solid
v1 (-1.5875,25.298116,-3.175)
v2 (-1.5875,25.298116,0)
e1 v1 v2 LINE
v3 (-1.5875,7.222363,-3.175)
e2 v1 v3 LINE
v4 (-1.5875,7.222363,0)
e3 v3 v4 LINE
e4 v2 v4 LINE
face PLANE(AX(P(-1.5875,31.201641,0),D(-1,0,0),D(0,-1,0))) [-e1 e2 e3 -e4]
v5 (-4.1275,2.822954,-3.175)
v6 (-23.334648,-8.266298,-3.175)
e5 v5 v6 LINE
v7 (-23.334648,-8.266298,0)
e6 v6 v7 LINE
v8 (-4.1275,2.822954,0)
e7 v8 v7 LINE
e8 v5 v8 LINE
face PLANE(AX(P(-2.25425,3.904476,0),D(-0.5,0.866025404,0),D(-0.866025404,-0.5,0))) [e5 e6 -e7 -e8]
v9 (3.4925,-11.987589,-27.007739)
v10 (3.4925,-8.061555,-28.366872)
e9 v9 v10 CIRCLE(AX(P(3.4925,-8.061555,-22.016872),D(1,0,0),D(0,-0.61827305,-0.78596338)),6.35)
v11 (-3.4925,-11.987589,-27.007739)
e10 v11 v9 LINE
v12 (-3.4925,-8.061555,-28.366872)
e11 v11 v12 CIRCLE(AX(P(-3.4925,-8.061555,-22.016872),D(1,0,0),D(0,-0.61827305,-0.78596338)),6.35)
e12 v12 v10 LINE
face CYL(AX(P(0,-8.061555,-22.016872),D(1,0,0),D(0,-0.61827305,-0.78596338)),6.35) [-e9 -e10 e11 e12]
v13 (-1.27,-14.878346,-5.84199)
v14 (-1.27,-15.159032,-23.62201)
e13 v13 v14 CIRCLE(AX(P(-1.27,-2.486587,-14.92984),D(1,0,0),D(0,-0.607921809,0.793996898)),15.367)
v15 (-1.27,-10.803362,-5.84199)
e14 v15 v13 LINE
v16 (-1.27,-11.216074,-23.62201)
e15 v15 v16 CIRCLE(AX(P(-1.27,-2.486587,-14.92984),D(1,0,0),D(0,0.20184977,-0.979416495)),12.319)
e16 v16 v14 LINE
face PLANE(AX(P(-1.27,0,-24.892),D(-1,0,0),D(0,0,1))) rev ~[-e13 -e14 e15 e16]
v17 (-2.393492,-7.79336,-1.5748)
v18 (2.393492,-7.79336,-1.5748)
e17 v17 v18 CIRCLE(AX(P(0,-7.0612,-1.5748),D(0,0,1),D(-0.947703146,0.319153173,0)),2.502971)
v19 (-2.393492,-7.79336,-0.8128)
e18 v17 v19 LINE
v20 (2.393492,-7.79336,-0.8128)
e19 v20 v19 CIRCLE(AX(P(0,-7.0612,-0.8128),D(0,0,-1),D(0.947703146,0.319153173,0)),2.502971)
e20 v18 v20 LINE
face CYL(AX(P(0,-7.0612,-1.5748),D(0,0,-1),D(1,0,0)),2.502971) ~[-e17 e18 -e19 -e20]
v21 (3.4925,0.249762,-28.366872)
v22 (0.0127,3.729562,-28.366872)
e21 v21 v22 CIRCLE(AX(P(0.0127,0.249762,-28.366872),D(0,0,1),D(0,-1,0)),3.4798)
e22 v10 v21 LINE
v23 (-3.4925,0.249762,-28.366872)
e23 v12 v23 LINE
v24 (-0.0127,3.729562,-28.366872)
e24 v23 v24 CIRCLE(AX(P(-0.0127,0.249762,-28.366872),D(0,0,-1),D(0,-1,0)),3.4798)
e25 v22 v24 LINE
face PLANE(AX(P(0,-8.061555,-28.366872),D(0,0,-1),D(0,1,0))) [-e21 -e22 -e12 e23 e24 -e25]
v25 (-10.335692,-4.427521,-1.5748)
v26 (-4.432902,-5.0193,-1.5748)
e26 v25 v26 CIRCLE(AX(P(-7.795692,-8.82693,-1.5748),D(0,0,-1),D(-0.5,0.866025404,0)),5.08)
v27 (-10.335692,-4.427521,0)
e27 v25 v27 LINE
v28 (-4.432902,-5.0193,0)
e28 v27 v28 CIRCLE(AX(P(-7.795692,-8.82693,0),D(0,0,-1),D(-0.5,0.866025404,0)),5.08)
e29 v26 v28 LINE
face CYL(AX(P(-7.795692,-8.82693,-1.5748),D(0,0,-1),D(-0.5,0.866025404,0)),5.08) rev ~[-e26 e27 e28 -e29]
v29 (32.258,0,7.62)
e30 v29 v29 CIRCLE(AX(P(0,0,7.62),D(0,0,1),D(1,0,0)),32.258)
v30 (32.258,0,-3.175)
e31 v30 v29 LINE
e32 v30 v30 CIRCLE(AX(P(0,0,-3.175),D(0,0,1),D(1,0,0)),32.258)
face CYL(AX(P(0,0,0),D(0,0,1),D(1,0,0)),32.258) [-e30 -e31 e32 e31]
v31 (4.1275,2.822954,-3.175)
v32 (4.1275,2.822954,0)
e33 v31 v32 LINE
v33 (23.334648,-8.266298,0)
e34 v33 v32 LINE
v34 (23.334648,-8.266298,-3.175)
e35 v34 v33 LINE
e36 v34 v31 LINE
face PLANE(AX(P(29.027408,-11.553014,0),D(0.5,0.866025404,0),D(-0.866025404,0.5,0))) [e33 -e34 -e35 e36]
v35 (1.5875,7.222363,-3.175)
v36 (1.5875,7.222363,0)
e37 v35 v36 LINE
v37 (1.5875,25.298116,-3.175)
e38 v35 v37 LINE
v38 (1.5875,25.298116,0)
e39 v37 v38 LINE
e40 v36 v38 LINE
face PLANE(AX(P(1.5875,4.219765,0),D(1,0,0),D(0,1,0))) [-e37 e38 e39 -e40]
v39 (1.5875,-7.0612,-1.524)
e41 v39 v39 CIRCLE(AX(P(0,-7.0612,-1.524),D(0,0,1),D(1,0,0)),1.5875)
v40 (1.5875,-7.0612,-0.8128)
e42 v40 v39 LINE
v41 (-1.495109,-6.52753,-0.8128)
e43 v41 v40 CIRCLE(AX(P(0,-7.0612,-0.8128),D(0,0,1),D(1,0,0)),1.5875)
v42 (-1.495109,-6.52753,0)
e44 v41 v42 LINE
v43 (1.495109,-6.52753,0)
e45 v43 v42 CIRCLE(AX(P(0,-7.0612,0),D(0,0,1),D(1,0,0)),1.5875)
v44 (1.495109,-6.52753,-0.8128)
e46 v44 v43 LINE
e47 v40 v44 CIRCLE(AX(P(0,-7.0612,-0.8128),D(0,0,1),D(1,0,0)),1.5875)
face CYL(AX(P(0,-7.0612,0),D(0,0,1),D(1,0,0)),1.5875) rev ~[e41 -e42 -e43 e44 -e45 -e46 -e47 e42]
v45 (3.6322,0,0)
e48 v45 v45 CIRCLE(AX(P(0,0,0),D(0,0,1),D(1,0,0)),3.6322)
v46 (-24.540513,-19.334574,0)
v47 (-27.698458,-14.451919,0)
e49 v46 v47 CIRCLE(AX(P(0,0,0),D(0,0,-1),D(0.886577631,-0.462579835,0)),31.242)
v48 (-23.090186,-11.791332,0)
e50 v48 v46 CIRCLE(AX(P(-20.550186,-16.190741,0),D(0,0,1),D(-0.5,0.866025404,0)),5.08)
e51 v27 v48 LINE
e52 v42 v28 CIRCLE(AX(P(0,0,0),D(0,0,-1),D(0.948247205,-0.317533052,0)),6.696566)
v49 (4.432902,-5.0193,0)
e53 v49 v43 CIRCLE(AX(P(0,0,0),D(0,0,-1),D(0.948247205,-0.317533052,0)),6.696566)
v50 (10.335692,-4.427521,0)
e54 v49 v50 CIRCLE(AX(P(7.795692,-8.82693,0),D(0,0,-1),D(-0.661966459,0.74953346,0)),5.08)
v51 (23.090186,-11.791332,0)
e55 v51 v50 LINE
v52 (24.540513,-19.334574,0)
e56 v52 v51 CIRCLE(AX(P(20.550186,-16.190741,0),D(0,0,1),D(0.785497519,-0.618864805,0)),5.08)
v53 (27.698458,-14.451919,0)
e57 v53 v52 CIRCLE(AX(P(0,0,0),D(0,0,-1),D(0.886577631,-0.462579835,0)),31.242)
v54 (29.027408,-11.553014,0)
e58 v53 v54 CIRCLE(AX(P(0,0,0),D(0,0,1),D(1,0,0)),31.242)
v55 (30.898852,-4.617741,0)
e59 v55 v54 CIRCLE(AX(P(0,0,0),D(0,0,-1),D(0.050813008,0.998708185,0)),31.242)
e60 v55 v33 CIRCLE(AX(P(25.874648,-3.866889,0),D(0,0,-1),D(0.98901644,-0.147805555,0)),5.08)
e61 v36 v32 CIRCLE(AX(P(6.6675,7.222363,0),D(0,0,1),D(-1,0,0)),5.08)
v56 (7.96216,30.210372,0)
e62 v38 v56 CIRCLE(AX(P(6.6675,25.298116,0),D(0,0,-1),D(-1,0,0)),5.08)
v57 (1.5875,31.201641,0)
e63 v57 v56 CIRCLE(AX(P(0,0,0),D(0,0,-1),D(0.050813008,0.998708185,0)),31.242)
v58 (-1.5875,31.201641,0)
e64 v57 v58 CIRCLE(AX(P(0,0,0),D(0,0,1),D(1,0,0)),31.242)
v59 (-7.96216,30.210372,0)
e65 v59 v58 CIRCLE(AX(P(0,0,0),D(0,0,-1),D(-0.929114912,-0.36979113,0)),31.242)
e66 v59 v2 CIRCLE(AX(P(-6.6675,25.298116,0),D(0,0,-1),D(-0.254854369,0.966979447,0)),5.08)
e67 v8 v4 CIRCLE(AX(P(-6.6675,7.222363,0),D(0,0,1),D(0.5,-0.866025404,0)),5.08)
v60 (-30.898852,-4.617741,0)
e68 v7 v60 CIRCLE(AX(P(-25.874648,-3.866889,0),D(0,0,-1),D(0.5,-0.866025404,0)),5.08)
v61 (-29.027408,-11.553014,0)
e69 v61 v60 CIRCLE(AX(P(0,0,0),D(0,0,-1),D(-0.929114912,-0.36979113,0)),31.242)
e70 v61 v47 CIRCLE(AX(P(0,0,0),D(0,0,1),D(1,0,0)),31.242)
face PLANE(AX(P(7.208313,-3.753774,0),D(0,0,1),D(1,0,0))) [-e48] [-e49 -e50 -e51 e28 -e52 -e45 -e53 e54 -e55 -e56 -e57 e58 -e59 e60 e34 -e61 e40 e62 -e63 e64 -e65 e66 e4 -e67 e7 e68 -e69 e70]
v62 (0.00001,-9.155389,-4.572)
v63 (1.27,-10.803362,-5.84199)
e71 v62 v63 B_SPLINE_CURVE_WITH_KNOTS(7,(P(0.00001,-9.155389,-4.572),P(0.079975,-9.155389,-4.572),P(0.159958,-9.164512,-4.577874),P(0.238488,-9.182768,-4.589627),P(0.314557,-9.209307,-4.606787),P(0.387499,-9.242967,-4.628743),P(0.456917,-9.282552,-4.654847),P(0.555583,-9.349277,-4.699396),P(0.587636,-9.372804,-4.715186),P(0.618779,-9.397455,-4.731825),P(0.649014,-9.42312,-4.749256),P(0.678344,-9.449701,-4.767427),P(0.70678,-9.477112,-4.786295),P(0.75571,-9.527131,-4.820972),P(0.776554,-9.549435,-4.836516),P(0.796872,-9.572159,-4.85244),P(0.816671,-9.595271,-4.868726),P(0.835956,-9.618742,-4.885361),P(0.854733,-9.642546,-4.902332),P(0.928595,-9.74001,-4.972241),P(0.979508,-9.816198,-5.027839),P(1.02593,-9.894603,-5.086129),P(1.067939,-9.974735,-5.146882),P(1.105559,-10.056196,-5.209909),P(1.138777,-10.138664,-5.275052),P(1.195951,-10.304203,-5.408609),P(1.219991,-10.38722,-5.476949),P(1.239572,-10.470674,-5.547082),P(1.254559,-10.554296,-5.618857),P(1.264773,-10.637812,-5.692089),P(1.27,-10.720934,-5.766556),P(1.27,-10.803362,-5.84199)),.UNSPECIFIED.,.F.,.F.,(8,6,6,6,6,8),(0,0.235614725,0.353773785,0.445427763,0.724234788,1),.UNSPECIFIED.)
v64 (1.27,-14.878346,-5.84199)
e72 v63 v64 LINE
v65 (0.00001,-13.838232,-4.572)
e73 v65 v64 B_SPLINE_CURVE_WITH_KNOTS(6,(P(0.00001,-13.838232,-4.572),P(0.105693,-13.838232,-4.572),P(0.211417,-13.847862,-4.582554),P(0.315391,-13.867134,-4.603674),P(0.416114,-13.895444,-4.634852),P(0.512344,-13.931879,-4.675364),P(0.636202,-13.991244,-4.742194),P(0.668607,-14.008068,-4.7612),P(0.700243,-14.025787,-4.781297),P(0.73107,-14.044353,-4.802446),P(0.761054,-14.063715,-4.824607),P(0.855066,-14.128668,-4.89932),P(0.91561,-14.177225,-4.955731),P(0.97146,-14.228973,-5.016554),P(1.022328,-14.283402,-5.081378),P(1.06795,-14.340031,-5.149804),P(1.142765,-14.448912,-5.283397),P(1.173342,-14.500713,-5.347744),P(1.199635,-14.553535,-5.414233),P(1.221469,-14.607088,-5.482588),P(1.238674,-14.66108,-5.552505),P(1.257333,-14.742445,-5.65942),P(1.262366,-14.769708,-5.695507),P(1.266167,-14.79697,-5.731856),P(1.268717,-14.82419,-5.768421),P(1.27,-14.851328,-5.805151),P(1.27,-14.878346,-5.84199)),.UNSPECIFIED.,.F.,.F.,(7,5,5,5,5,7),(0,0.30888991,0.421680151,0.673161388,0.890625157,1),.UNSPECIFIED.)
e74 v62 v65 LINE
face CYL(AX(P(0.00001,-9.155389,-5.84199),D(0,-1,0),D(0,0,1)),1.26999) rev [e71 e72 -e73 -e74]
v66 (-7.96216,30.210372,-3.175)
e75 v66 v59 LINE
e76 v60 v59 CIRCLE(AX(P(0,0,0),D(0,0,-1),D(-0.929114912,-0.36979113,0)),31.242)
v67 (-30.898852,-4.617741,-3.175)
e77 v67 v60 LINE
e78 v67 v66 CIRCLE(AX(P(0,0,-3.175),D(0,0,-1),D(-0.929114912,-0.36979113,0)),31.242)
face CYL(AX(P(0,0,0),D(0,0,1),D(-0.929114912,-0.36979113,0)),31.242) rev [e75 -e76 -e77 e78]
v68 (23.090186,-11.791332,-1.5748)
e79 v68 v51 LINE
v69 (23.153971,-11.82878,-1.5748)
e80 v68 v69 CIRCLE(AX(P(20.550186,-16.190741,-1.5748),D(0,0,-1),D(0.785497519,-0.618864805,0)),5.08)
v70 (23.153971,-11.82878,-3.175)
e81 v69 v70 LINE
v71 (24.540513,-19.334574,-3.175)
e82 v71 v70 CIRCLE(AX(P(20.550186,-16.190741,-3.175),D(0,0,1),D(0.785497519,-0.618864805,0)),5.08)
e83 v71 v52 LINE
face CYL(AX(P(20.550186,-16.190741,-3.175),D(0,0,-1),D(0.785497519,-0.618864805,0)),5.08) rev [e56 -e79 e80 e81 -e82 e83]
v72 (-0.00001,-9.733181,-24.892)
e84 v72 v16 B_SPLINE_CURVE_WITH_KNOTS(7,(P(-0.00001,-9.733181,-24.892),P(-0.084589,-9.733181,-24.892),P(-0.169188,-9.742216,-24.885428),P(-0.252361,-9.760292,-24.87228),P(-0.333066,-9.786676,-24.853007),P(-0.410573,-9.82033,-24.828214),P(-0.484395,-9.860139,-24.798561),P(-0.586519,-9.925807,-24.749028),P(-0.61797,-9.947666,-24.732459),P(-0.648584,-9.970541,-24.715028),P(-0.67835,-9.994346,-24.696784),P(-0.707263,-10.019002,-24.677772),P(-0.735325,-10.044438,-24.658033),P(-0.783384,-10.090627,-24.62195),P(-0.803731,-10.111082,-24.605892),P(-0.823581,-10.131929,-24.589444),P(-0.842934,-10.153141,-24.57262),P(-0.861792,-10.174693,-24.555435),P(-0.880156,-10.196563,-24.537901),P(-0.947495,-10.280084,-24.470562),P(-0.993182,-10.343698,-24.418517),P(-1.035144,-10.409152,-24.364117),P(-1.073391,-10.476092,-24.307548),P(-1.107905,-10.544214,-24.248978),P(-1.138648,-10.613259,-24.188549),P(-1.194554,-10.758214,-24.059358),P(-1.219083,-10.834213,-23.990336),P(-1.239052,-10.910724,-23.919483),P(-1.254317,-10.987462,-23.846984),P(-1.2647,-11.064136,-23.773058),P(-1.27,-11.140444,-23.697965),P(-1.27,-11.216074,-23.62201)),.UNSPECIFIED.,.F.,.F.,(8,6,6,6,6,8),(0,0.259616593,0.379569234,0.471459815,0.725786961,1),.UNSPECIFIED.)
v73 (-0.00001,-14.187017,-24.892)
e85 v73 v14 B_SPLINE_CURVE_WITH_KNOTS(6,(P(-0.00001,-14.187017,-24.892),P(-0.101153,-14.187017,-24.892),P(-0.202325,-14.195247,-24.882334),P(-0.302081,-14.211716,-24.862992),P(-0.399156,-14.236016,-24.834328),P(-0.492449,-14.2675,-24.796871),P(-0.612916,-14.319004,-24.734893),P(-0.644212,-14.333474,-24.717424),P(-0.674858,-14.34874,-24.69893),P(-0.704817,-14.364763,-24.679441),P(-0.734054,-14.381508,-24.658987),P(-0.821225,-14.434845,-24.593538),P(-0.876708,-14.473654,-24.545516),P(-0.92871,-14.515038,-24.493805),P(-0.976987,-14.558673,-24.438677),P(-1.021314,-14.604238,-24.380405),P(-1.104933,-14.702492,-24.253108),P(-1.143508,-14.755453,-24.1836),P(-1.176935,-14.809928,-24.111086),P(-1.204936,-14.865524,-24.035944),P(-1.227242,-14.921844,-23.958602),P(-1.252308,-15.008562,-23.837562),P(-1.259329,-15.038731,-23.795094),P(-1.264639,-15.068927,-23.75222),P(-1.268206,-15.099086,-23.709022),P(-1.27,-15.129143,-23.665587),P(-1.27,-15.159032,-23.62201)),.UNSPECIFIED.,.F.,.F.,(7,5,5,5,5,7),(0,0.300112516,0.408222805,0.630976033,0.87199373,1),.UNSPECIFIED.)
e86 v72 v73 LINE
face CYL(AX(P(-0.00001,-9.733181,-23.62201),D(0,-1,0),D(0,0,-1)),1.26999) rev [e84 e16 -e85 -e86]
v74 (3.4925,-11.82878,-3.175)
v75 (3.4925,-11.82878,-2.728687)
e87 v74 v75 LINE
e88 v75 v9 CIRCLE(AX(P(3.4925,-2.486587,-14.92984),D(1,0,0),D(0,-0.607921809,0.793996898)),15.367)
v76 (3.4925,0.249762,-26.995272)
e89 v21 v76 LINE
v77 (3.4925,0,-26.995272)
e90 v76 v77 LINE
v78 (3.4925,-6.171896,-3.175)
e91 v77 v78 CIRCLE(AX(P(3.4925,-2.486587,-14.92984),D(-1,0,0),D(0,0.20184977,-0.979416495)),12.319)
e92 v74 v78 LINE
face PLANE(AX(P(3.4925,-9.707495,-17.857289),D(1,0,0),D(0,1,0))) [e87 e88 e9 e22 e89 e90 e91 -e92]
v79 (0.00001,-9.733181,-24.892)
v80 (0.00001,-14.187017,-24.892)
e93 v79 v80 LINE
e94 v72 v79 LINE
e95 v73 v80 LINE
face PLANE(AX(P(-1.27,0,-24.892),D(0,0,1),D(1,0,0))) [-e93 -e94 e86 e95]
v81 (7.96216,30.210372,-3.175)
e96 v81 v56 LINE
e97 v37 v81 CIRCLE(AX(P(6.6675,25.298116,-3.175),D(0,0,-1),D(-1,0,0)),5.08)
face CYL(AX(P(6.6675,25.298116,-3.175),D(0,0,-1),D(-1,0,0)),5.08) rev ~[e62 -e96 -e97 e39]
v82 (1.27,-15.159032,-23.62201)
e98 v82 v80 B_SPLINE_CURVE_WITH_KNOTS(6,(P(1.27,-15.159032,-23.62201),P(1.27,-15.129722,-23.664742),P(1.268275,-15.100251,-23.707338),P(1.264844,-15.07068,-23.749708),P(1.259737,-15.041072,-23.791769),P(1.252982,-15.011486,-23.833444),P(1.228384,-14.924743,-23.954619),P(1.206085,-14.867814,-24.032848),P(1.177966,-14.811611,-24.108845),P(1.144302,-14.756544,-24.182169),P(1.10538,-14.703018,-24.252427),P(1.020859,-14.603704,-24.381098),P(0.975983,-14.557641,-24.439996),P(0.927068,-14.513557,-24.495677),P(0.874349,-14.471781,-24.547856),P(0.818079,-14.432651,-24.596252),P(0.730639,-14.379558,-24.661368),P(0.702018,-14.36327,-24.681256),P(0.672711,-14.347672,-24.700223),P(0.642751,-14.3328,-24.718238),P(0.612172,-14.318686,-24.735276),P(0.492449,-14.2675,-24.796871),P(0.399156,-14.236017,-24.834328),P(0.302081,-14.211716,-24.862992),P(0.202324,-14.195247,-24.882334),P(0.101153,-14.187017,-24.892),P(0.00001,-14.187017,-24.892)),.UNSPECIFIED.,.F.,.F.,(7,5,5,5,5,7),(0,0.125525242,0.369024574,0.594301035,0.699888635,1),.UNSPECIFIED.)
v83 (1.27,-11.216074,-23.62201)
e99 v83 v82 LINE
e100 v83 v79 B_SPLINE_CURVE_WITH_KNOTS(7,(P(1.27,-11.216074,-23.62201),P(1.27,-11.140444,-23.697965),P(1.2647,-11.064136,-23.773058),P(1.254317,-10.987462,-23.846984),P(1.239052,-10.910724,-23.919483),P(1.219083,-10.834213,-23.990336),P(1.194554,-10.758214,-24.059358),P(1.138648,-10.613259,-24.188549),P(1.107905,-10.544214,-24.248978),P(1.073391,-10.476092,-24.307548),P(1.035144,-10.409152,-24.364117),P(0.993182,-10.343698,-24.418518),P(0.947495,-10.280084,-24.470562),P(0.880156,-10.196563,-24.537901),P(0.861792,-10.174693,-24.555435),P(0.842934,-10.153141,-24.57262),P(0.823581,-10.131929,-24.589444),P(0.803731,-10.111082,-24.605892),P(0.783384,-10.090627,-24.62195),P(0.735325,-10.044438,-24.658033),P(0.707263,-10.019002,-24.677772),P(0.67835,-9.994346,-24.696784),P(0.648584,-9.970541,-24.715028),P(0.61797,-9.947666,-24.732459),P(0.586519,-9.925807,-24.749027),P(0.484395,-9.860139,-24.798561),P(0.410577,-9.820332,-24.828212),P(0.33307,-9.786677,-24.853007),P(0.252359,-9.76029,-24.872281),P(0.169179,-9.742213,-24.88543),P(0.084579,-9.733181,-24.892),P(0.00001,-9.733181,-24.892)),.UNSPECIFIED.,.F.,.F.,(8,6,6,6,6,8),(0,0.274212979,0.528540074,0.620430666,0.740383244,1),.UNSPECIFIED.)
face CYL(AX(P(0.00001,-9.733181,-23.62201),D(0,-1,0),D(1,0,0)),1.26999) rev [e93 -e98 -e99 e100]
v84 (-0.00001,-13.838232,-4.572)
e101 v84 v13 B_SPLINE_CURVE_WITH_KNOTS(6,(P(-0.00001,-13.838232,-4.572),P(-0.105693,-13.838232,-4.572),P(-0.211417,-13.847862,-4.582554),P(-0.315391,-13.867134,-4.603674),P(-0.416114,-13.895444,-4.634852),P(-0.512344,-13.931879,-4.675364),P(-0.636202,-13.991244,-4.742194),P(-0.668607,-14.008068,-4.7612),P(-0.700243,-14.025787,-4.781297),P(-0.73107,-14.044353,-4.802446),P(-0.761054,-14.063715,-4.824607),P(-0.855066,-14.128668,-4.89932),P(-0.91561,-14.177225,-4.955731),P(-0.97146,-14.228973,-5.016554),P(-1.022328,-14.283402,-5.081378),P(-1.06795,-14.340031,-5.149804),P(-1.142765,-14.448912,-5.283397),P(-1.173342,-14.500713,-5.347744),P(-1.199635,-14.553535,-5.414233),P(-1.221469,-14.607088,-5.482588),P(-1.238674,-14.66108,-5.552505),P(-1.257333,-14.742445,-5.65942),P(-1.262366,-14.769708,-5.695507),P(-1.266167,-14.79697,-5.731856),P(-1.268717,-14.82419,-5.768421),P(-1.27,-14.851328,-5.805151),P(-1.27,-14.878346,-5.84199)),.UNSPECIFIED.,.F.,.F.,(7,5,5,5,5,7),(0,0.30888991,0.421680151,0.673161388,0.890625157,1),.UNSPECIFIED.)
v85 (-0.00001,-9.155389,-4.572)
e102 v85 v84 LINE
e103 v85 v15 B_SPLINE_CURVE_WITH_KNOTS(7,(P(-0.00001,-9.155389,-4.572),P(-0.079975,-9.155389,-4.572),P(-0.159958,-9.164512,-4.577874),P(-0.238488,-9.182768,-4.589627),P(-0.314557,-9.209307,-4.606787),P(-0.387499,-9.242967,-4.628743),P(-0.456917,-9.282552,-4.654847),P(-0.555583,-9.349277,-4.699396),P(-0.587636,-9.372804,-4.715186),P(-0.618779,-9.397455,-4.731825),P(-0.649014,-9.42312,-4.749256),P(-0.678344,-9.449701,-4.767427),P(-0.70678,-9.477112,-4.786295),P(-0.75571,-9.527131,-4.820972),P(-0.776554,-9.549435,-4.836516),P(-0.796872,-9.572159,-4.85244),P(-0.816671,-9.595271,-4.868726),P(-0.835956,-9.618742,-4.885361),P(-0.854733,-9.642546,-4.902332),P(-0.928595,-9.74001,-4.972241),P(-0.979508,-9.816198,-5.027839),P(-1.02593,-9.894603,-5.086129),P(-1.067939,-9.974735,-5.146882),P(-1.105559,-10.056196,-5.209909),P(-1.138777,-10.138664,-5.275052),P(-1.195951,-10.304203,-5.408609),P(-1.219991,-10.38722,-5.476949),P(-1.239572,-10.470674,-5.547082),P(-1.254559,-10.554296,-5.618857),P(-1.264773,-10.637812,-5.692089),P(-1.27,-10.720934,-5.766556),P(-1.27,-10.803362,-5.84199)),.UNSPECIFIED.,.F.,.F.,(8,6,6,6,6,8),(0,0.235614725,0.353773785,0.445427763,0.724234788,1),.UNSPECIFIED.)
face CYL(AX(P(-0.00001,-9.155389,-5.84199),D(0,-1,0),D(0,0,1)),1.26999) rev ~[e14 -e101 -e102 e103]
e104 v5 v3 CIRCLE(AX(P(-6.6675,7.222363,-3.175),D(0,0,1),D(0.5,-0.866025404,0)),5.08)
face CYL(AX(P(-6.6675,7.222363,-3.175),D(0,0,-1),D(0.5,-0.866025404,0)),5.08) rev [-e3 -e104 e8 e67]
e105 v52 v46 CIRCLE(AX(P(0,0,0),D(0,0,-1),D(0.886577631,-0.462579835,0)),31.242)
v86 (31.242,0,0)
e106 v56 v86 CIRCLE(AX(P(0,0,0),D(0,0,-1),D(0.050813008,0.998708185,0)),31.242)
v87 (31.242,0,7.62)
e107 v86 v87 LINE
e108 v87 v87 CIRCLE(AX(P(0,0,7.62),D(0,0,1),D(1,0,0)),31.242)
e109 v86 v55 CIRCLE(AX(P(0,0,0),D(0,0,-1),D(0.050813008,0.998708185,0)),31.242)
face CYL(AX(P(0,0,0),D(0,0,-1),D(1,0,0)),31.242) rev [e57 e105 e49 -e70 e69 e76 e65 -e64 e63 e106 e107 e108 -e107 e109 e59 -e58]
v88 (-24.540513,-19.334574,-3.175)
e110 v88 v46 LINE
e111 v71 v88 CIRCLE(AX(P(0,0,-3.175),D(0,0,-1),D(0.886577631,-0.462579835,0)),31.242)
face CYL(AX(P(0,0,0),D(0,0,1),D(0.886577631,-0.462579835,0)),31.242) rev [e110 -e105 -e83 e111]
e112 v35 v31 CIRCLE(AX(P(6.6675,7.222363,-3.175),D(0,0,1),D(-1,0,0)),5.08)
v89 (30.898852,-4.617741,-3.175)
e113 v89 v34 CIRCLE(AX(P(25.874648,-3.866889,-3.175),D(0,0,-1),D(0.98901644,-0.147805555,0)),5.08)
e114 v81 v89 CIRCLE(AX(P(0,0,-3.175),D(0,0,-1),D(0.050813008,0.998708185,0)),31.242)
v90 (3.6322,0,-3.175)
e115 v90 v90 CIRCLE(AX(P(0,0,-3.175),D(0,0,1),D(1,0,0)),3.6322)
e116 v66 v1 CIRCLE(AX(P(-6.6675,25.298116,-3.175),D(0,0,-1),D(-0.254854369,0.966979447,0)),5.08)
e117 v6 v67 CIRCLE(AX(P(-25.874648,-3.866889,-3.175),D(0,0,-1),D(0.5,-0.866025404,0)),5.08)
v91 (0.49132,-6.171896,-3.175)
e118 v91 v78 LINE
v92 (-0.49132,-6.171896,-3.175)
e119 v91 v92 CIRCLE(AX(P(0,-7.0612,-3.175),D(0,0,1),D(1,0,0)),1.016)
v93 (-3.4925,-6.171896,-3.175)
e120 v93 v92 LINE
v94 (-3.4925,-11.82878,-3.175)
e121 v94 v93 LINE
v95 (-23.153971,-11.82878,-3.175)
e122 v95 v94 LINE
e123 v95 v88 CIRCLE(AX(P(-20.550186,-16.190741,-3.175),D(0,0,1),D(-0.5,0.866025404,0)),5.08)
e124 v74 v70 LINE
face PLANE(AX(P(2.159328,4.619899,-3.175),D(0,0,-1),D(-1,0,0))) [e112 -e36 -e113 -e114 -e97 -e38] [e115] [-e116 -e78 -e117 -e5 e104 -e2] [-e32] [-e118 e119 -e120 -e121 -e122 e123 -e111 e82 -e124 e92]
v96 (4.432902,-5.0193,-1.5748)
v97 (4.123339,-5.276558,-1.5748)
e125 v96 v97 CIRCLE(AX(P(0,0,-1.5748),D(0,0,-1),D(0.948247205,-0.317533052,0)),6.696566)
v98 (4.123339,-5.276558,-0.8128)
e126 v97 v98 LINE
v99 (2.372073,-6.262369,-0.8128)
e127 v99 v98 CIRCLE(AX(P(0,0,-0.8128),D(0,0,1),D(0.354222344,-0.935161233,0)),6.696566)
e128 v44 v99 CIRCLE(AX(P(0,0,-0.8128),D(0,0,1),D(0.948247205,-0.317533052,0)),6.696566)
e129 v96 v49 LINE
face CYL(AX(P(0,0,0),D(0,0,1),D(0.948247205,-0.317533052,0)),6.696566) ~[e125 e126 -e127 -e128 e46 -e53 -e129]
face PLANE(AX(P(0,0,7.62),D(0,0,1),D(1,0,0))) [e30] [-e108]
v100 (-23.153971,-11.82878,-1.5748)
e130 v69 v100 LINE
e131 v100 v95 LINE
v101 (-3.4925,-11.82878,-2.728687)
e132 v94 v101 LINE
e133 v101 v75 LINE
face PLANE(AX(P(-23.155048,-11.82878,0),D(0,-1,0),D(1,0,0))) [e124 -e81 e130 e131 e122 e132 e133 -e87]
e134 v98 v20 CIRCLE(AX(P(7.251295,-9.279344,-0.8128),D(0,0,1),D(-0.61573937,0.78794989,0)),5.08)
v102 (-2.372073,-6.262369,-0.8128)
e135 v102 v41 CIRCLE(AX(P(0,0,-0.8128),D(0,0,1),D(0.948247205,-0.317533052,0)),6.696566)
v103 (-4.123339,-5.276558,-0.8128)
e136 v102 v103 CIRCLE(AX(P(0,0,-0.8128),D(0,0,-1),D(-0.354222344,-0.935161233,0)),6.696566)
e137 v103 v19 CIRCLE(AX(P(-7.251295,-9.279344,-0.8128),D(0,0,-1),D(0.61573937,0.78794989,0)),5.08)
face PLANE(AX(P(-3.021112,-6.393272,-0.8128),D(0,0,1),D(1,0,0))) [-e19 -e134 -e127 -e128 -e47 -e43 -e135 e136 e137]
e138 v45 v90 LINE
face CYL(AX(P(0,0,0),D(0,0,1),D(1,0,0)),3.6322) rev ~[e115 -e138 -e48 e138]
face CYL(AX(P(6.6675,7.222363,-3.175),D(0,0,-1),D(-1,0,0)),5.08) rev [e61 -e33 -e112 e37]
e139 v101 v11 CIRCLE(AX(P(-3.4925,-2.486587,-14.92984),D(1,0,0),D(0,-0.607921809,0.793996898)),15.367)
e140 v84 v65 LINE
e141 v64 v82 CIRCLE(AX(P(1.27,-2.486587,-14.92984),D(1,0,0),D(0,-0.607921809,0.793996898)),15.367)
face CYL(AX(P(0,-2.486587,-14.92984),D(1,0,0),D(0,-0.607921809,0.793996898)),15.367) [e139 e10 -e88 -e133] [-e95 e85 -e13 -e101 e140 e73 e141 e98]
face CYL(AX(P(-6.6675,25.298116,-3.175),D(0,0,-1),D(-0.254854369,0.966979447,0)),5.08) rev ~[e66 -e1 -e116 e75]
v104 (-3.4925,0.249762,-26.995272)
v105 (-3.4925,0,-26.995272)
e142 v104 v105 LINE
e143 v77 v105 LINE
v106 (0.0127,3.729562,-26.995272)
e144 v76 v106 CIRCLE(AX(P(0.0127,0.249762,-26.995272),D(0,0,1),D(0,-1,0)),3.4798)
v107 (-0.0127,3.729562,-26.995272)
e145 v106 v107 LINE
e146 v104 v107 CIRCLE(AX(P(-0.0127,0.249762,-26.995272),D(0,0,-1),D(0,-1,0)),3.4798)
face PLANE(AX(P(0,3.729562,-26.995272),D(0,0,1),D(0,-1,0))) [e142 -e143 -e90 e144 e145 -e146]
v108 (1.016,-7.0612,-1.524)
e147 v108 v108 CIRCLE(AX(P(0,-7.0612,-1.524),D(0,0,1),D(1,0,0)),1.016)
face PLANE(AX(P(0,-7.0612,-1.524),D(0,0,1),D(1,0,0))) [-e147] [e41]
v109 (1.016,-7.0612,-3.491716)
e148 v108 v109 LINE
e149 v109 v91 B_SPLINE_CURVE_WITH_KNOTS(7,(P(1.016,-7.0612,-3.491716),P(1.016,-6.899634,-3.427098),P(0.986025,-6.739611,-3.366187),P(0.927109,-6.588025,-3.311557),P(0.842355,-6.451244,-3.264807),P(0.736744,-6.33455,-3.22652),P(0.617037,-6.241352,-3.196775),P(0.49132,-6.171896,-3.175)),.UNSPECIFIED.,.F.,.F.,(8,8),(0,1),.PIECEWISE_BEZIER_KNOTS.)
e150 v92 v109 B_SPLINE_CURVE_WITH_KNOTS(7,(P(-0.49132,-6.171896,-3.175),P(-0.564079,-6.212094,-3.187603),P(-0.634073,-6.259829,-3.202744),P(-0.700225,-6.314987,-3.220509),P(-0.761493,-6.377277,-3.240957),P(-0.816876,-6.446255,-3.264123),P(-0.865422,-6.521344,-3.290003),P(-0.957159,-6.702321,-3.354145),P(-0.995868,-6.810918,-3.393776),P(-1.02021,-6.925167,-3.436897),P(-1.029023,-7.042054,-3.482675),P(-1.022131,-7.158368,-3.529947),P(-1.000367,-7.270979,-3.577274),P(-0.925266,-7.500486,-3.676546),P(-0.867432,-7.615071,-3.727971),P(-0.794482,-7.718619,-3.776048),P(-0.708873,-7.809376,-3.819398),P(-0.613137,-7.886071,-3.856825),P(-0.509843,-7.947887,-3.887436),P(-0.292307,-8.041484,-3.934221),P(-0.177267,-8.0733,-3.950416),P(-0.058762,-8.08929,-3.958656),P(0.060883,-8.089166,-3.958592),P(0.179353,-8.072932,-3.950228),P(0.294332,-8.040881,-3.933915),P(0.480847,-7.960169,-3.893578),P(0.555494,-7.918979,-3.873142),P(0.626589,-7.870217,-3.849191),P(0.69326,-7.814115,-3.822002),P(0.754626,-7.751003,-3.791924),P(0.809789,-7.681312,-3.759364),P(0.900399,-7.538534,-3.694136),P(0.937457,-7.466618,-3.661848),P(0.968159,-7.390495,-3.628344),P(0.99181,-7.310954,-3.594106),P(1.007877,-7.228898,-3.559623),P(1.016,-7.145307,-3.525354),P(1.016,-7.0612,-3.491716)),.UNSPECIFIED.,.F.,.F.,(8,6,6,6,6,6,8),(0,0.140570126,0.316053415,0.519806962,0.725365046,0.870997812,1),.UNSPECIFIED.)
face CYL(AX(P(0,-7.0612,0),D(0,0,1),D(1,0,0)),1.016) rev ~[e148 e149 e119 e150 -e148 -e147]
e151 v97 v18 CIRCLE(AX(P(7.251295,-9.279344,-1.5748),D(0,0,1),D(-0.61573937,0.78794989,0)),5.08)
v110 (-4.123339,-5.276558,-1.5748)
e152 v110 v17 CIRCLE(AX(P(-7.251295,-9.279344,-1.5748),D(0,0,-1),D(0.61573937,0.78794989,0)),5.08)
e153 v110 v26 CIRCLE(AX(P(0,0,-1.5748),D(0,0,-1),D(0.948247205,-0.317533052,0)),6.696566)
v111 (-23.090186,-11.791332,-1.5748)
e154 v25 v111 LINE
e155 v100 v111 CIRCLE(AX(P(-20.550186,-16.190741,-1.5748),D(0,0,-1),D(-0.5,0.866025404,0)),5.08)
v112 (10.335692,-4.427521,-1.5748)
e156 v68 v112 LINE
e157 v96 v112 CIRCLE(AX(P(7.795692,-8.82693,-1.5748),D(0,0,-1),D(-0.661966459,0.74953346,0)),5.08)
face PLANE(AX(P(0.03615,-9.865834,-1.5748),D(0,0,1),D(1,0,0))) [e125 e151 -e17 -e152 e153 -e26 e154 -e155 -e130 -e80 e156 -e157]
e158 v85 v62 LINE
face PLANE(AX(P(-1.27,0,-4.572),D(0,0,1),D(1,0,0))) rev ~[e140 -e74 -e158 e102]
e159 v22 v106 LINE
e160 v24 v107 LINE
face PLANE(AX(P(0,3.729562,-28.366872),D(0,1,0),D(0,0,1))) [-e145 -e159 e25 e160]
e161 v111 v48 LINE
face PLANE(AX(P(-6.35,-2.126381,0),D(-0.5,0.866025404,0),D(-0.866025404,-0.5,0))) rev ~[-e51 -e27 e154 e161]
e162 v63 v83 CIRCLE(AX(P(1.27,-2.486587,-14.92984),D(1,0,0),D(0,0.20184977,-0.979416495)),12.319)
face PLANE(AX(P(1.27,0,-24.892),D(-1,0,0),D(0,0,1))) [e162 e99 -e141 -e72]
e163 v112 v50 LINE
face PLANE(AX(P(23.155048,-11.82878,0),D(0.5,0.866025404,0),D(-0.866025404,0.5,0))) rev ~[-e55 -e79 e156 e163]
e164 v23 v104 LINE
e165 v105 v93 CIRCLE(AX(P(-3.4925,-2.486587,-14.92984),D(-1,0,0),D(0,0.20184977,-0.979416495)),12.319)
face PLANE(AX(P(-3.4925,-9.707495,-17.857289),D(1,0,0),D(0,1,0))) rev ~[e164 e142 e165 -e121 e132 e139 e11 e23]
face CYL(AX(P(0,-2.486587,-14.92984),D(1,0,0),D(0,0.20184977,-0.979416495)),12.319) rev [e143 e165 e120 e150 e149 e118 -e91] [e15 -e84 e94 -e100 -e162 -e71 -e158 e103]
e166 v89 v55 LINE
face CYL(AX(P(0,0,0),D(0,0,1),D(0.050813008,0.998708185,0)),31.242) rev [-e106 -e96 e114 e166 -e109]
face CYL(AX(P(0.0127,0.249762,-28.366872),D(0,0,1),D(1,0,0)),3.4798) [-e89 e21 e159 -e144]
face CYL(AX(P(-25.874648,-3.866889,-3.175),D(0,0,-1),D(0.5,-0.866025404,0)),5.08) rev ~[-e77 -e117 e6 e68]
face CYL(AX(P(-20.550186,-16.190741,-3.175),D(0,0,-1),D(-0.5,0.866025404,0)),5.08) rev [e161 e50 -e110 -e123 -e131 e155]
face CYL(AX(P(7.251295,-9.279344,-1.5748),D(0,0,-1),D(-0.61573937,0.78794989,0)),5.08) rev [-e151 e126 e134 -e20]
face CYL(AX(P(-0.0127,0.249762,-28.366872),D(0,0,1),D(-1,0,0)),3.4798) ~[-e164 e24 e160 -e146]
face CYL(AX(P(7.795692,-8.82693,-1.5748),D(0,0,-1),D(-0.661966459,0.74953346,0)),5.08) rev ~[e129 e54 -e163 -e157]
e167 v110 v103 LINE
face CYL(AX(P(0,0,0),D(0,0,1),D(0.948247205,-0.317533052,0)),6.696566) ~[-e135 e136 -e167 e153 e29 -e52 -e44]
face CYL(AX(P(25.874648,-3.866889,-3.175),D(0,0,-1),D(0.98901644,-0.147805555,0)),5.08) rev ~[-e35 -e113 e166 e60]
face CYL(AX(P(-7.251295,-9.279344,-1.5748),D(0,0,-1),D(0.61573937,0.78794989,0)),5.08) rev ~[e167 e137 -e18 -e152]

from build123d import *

# Parameters (mm, degrees)
F0_R         = 32.258
F0_R_2       = 3.6322
F1_DEPTH     = 3.175
F4_DEPTH     = 3.4925
F5_W         = 2.54
F5_H         = 20.32
F6_DEPTH     = 25.4
F7_R         = 1.26999
F8_R         = 3.4798
F9_R         = 32.258
F9_R_2       = 31.242
F10_DEPTH    = 7.62
F12_DEPTH    = 1.5748
F13_T1_DEPTH = 3.175
F13_T3_DEPTH = 1.5748
F14_R        = 2.5029708097
F15_DEPTH    = 0.762
F16_T1_DEPTH = 0.762
F17_R        = 1.016
F18_DEPTH    = 25.4
F19_R        = 1.5875
F20_DEPTH    = 1.524


# Not quite as in the source:
# - a fillet or chamfer that OpenCascade refuses, or shapes differently, is made with other operations: its cross-section is extruded or revolved along the edge and cut away or added
# - a fillet or chamfer is up to 0.001 mm smaller than in the source, because OpenCascade refuses the exact size


with BuildPart() as f1:
    # F0 (on Top) → F1 (new body)
    with BuildSketch(Plane.XY):
        Circle(F0_R)
        with BuildLine():
            ThreePointArc((27.6984583499, -14.4519192165), (0, -31.242), (-27.6984583499, -14.4519192165))
            Line((-27.6984583499, -14.4519192165), (-23.1550479516, -11.82878))
            Line((-23.1550479516, -11.82878), (23.1550479516, -11.82878))
            Line((23.1550479516, -11.82878), (27.6984583499, -14.4519192165))
        make_face(mode=Mode.SUBTRACT)
        with BuildLine():
            ThreePointArc((-1.5875, 4.2197649224), (-1.9273330318, 4.0757771817), (-2.25425, 3.904475533))
            Line((-2.25425, 3.904475533), (-29.0274080844, -11.5530144941))
            ThreePointArc((-29.0274080844, -11.5530144941), (-26.2927422142, 16.8746635777), (-1.5875, 31.2016411067))
            Line((-1.5875, 31.2016411067), (-1.5875, 4.2197649224))
        make_face(mode=Mode.SUBTRACT)
        Circle(F0_R_2, mode=Mode.SUBTRACT)
        with BuildLine():
            Line((29.0274080844, -11.5530144941), (2.25425, 3.904475533))
            ThreePointArc((2.25425, 3.904475533), (1.9273330318, 4.0757771817), (1.5875, 4.2197649224))
            Line((1.5875, 4.2197649224), (1.5875, 31.2016411067))
            ThreePointArc((1.5875, 31.2016411067), (26.2927422142, 16.8746635777), (29.0274080844, -11.5530144941))
        make_face(mode=Mode.SUBTRACT)
    extrude(amount=-F1_DEPTH)

    # F3 (on offset) → F4 (join, symmetric)
    with BuildSketch(Plane.YZ):
        with BuildLine():
            ThreePointArc((0, -26.9952715967), (-14.4117945702, -18.019693004), (-6.1718963048, -3.175))
            Line((-6.1718963048, -3.175), (-6.1718963048, -2.7284894604))
            Line((-6.1718963048, -2.7284894604), (-11.8285217471, -2.7284894604))
            ThreePointArc((-11.8285217471, -2.7284894604), (-17.8532575218, -14.8291637745), (-11.9875892757, -27.0077390621))
            ThreePointArc((-11.9875892757, -27.0077390621), (-10.1388723772, -28.0174760831), (-8.0615554064, -28.3668715967))
            Line((-8.0615554064, -28.3668715967), (3.7295622751, -28.3668715967))
            Line((3.7295622751, -28.3668715967), (3.7295622751, -26.9952715967))
            Line((3.7295622751, -26.9952715967), (0, -26.9952715967))
        make_face()
    extrude(amount=F4_DEPTH, both=True)

    # F5 (on Front) → F6 (cut)
    with BuildSketch(Plane.XZ):
        with Locations((0, -14.732)):
            Rectangle(F5_W, F5_H)
    extrude(amount=F6_DEPTH, mode=Mode.SUBTRACT)

    # F7 (radius 1.27 in the source; OpenCascade refuses exactly that, so slightly less here)
    f7_edges = [f1.edges().sort_by_distance(p)[0] for p in [
        (1.27, -11.496811, -4.572),
        (-1.27, -11.496811, -4.572),
        (1.27, -11.960099, -24.892),
        (-1.27, -11.960099, -24.892),
    ]]
    fillet(f7_edges, radius=F7_R)

    # F8
    f8_edges = [f1.edges().sort_by_distance(p)[0] for p in [
        (-3.4925, 3.729562, -27.681072),
        (3.4925, 3.729562, -27.681072),
    ]]
    fillet(f8_edges, radius=F8_R)

    # F9 (on face) → F10 (join)
    with BuildSketch(Plane.XY):
        Circle(F9_R)
        Circle(F9_R_2, mode=Mode.SUBTRACT)
    extrude(amount=F10_DEPTH)

    # F11 (on face) → F12 (cut)
    with BuildSketch(Plane.XY):
        with BuildLine():
            Line((-6.35, -2.1263810414), (-23.1550479516, -11.82878))
            Line((-23.1550479516, -11.82878), (-23.1550479516, -13.7292239815))
            Line((-23.1550479516, -13.7292239815), (23.1550479516, -13.8936461881))
            Line((23.1550479516, -13.8936461881), (23.1550479516, -11.82878))
            Line((23.1550479516, -11.82878), (6.35, -2.1263810414))
            ThreePointArc((6.35, -2.1263810414), (0, -6.6965660105), (-6.35, -2.1263810414))
        make_face()
    extrude(amount=-F12_DEPTH, mode=Mode.SUBTRACT)

    # F13: fillet of radius 5.08 on 10 edges, made by hand

    # F13_s2 → F13_t1 (join)
    with BuildSketch(Plane.XY.offset(-3.175)):
        with BuildLine():
            ThreePointArc((1.5875, 7.2223631924), (2.2680909488, 4.6823631924), (4.1275, 2.8229541412))
            Line((4.1275, 2.8229541412), (3.8735, 2.3830132361))
            ThreePointArc((3.8735, 2.3830132361), (2.00025, 3.4645346278), (1.4086267606, 3.7442984522))
            Line((1.4086267606, 3.7442984522), (1.0795, 4.2197649224))
            Line((1.0795, 4.2197649224), (1.0795, 7.2223631924))
            Line((1.0795, 7.2223631924), (1.5875, 7.2223631924))
        make_face()
        with BuildLine():
            ThreePointArc((-4.1275, 2.8229541412), (-2.2680909488, 4.6823631924), (-1.5875, 7.2223631924))
            Line((-1.5875, 7.2223631924), (-1.0795, 7.2223631924))
            Line((-1.0795, 7.2223631924), (-1.0795, 4.2197649224))
            Line((-1.0795, 4.2197649224), (-1.4086267606, 3.7442984522))
            ThreePointArc((-1.4086267606, 3.7442984522), (-2.00025, 3.4645346278), (-3.8735, 2.3830132361))
            Line((-3.8735, 2.3830132361), (-4.1275, 2.8229541412))
        make_face()
        with BuildLine():
            ThreePointArc((1.5875, 25.2981162886), (3.5667318521, 29.3219995987), (7.9621601942, 30.2103718786))
            ThreePointArc((7.9621601942, 30.2103718786), (4.8004849887, 30.870988126), (1.5875, 31.2016411067))
            Line((1.5875, 31.2016411067), (1.5875, 25.2981162886))
        make_face()
        with BuildLine():
            ThreePointArc((-7.9621601942, 30.2103718786), (-3.5667318521, 29.3219995987), (-1.5875, 25.2981162886))
            Line((-1.5875, 25.2981162886), (-1.5875, 31.2016411067))
            ThreePointArc((-1.5875, 31.2016411067), (-4.8004849887, 30.870988126), (-7.9621601942, 30.2103718786))
        make_face()
        with BuildLine():
            ThreePointArc((-23.0901860951, -11.7913319897), (-25.5388151591, -15.2315851298), (-24.5405134922, -19.3345742528))
            ThreePointArc((-24.5405134922, -19.3345742528), (-26.2333304182, -16.9668777083), (-27.6984583499, -14.4519192165))
            Line((-27.6984583499, -14.4519192165), (-23.0901860951, -11.7913319897))
        make_face()
        with BuildLine():
            ThreePointArc((-23.3346480943, -8.2662979814), (-28.0816389218, -8.4424316835), (-30.8988516077, -4.6177411496))
            ThreePointArc((-30.8988516077, -4.6177411496), (-30.1631174493, -8.1393433235), (-29.0274080844, -11.5530144941))
            Line((-29.0274080844, -11.5530144941), (-23.3346480943, -8.2662979814))
        make_face()
        with BuildLine():
            ThreePointArc((24.5405134922, -19.3345742528), (25.5388151591, -15.2315851298), (23.0901860951, -11.7913319897))
            Line((23.0901860951, -11.7913319897), (27.6984583499, -14.4519192165))
            ThreePointArc((27.6984583499, -14.4519192165), (26.2333304182, -16.9668777083), (24.5405134922, -19.3345742528))
        make_face()
        with BuildLine():
            ThreePointArc((30.8988516077, -4.6177411496), (28.0816389218, -8.4424316835), (23.3346480943, -8.2662979814))
            Line((23.3346480943, -8.2662979814), (29.0274080844, -11.5530144941))
            ThreePointArc((29.0274080844, -11.5530144941), (30.1631174493, -8.1393433235), (30.8988516077, -4.6177411496))
        make_face()
    extrude(amount=F13_T1_DEPTH)

    # F13_s4 → F13_t3 (join)
    with BuildSketch(Plane.XY.offset(-1.5748)):
        with BuildLine():
            ThreePointArc((4.4329020877, -5.0193002913), (7.2889409664, -3.7722686868), (10.3356916982, -4.4275212163))
            Line((10.3356916982, -4.4275212163), (6.35, -2.1263810414))
            ThreePointArc((6.35, -2.1263810414), (5.5821133816, -3.6991899827), (4.4329020877, -5.0193002913))
        make_face()
        with BuildLine():
            ThreePointArc((-10.3356916982, -4.4275212163), (-7.2889409664, -3.7722686868), (-4.4329020877, -5.0193002913))
            ThreePointArc((-4.4329020877, -5.0193002913), (-5.5821133816, -3.6991899827), (-6.35, -2.1263810414))
            Line((-6.35, -2.1263810414), (-10.3356916982, -4.4275212163))
        make_face()
    extrude(amount=F13_T3_DEPTH)

    # F14 (on face) → F15 (join)
    with BuildSketch(Plane.XY.offset(-1.5748)):
        with Locations((0, -7.0612)):
            Circle(F14_R)
    extrude(amount=F15_DEPTH)

    # F16: fillet of radius 5.08 on 2 edges, made by hand

    # F16_s2 → F16_t1 (join)
    with BuildSketch(Plane.XY.offset(-1.5748)):
        with BuildLine():
            ThreePointArc((-4.123339334, -5.2765584494), (-3.0648098759, -6.4018902356), (-2.3934920763, -7.7933601976))
            ThreePointArc((-2.3934920763, -7.7933601976), (-2.5027259003, -7.02618654), (-2.3720733098, -6.2623689245))
            ThreePointArc((-2.3720733098, -6.2623689245), (-3.2848975519, -5.8355329154), (-4.123339334, -5.2765584494))
        make_face()
        with BuildLine():
            ThreePointArc((4.123339334, -5.2765584494), (3.0648098759, -6.4018902356), (2.3934920763, -7.7933601976))
            ThreePointArc((2.3934920763, -7.7933601976), (2.5027259003, -7.02618654), (2.3720733098, -6.2623689245))
            ThreePointArc((2.3720733098, -6.2623689245), (3.2848975519, -5.8355329154), (4.123339334, -5.2765584494))
        make_face()
    extrude(amount=F16_T1_DEPTH)

    # F17 (on face) → F18 (cut)
    with BuildSketch(Plane.XY):
        with Locations((0, -7.0612)):
            Circle(F17_R)
    extrude(amount=-F18_DEPTH, mode=Mode.SUBTRACT)

    # F19 (on face) → F20 (cut)
    with BuildSketch(Plane.XY):
        with Locations((0, -7.0612)):
            Circle(F19_R)
    extrude(amount=-F20_DEPTH, mode=Mode.SUBTRACT)


solid = f1.part
